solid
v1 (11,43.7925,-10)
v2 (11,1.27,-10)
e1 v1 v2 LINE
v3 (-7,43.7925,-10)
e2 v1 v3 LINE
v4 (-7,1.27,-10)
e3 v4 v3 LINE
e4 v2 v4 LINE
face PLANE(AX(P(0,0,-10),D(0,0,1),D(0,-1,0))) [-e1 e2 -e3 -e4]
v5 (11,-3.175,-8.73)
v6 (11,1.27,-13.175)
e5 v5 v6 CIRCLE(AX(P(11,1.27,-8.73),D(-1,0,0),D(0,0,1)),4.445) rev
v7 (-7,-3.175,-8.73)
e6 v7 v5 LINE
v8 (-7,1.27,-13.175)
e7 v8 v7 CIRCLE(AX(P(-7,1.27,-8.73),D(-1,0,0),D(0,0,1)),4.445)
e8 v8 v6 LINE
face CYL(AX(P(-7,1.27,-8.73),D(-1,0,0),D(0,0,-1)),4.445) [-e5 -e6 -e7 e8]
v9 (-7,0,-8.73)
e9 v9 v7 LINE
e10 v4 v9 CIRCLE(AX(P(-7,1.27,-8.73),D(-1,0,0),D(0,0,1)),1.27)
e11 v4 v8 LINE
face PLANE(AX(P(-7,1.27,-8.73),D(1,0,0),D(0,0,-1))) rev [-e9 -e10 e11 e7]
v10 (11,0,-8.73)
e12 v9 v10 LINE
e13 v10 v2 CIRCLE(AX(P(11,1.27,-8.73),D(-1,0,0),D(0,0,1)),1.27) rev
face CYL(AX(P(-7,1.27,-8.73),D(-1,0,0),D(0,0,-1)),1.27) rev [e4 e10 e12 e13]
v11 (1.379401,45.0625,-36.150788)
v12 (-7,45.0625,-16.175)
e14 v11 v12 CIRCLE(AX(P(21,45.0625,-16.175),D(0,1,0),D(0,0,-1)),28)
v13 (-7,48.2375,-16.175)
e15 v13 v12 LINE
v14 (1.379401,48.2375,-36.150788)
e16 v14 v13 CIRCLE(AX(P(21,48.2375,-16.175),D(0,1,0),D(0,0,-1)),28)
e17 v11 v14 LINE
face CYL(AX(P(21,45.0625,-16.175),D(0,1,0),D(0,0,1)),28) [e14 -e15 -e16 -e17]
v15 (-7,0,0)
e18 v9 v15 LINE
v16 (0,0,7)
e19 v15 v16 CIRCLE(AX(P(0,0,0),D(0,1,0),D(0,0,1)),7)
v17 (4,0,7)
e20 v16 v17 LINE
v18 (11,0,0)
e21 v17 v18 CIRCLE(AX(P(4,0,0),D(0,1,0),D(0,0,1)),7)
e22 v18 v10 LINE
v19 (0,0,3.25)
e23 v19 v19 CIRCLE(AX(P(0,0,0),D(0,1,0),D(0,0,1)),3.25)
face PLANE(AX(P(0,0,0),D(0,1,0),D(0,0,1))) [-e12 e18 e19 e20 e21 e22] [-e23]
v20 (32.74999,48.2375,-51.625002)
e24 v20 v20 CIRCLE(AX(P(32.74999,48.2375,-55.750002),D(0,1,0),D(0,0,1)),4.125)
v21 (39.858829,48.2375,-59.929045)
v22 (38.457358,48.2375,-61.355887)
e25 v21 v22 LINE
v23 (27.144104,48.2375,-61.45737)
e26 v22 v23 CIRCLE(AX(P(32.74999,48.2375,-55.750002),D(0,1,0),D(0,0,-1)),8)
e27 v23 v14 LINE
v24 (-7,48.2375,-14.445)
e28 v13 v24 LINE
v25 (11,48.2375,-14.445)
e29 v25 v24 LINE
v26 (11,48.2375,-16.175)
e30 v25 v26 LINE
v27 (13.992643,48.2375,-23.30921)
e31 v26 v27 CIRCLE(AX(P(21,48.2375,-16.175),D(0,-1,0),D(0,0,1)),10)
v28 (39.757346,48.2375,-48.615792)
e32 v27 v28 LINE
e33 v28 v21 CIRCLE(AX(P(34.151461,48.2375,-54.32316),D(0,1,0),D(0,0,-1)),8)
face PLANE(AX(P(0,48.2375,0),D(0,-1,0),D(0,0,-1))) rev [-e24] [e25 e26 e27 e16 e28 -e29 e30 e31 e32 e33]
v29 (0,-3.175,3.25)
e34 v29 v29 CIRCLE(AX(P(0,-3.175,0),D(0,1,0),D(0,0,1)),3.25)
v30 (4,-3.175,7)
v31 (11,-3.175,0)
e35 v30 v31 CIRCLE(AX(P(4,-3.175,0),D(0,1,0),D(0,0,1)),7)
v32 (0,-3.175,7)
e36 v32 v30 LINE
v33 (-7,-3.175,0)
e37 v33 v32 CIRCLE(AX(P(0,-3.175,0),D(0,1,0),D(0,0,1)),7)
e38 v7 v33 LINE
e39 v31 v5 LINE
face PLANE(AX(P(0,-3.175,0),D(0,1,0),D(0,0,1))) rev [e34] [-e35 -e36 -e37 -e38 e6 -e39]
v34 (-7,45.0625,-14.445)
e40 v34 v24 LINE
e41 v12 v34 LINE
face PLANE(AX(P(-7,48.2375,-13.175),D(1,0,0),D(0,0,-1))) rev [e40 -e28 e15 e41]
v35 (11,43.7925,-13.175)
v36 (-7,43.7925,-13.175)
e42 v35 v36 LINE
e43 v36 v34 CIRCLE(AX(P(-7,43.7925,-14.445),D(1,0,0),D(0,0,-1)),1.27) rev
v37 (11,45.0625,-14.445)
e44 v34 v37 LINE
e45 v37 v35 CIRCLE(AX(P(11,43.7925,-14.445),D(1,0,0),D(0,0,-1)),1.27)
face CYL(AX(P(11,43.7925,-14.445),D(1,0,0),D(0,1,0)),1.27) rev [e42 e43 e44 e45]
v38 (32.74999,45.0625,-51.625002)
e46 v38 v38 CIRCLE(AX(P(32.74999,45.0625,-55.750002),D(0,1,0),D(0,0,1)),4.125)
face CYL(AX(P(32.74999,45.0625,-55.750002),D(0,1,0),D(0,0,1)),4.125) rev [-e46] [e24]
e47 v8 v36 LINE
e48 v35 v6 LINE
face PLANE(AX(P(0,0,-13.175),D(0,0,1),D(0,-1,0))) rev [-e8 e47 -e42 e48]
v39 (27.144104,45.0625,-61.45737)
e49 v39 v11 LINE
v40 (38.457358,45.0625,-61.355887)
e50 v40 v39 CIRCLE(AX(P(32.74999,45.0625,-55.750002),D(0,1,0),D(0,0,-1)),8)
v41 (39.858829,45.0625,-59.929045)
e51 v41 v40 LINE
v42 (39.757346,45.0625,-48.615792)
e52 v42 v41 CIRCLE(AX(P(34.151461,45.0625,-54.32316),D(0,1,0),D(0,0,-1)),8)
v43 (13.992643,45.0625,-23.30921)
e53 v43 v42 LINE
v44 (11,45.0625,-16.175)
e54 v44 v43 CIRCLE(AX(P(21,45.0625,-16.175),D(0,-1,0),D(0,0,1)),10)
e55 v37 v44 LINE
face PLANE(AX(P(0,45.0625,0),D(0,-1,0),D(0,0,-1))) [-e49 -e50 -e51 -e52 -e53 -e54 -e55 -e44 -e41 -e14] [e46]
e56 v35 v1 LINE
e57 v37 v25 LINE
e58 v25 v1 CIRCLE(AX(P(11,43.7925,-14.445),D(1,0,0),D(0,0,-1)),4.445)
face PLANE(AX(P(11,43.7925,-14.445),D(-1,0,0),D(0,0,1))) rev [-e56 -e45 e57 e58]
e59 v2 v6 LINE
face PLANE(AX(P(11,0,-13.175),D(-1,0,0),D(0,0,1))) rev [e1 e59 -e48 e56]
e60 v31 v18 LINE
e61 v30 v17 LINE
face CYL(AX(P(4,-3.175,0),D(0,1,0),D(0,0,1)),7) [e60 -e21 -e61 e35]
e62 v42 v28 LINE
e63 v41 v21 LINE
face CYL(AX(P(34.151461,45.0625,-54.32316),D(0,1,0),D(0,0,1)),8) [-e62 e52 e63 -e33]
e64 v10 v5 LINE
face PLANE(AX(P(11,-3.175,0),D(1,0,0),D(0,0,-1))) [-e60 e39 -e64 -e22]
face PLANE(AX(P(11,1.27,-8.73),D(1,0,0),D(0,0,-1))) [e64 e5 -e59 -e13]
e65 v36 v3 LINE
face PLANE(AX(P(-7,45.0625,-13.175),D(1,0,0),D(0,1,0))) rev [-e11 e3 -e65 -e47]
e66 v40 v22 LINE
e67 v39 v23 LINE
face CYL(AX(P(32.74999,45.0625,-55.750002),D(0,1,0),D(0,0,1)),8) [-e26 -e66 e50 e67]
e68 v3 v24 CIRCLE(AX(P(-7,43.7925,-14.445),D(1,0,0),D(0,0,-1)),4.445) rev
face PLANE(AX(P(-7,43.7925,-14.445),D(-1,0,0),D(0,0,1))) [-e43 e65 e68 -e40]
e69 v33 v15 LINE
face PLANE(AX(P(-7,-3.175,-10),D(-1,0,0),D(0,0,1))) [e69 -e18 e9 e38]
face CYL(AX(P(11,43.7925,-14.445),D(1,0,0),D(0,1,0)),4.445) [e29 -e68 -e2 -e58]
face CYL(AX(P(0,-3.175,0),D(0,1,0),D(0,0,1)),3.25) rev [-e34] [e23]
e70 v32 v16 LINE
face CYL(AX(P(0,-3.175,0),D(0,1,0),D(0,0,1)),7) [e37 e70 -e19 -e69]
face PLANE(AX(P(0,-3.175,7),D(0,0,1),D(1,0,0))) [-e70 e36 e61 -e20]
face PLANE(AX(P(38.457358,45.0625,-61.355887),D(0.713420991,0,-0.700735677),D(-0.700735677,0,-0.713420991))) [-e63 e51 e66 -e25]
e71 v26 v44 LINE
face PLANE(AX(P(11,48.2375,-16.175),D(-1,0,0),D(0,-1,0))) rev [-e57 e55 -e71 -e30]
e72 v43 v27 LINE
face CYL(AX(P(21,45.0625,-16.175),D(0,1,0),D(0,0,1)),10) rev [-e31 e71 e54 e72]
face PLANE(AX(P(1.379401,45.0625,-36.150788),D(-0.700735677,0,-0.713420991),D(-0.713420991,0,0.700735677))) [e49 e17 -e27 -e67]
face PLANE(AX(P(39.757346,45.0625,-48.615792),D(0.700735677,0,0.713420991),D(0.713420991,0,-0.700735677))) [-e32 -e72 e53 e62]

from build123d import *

# Parameters (mm, degrees)
SKETCH1_R                    = 3.25
BASE_FLANGE1_DEPTH           = 3.175
EDGE_FLANGE1_STRIP_W         = 15.24
EDGE_FLANGE1_STRIP_H         = 3.175
EDGE_FLANGE1_STRIP_CUT_DEPTH = 18
EDGE_FLANGE1_DEPTH           = 18
EDGE_FLANGE2_STRIP_W         = 15.24
EDGE_FLANGE2_STRIP_H         = 3.175
EDGE_FLANGE2_STRIP_CUT_DEPTH = 18
EDGE_FLANGE2_DEPTH           = 18
SKETCH12_R                   = 4.125
BOSS_EXTRUDE1_DEPTH          = 3.175


# Sheet-metal steps are written as plain solids
with BuildPart() as part:
    # Sketch1 → Base-Flange1 (new body)
    with BuildSketch(Plane(origin=(0, 0, 0), x_dir=(1, 0, 0), z_dir=(0, 1, 0))):
        with BuildLine():
            Line((-7, 10), (-7, 0))
            ThreePointArc((-7, 0), (-4.949747468, -4.949747468), (0, -7))
            Line((0, -7), (4, -7))
            ThreePointArc((4, -7), (8.949747468, -4.949747468), (11, 0))
            Line((11, 0), (11, 10))
            Line((11, 10), (-7, 10))
        make_face()
        with Locations(Location((0, 0, 0), (0, 0, 270))):
            Circle(SKETCH1_R, mode=Mode.SUBTRACT)
    extrude(amount=-BASE_FLANGE1_DEPTH)

    # Edge-Flange1 strip (across the edge) → Edge-Flange1 strip cut (cut)
    with BuildSketch(Plane(origin=(11, 0, -10), x_dir=(0, 0, 1), z_dir=(-1, 0, 0))):
        with Locations((-6.35, -1.5875)):
            Rectangle(EDGE_FLANGE1_STRIP_W, EDGE_FLANGE1_STRIP_H)
    extrude(amount=EDGE_FLANGE1_STRIP_CUT_DEPTH, mode=Mode.SUBTRACT)

    # Edge-Flange1 section (across the edge) → Edge-Flange1 (add)
    with BuildSketch(Plane(origin=(11, 0, -10), x_dir=(0, 0, 1), z_dir=(-1, 0, 0))):
        with BuildLine():
            Line((-3.175, 1.27), (-3.175, 45.0625))
            Line((-3.175, 45.0625), (0, 45.0625))
            Line((0, 45.0625), (0, 1.27))
            ThreePointArc((0, 1.27), (0.371974388, 0.371974388), (1.27, 0))
            Line((1.27, 0), (1.27, -3.175))
            ThreePointArc((1.27, -3.175), (-1.873089642, -1.873089642), (-3.175, 1.27))
        make_face()
    extrude(amount=EDGE_FLANGE1_DEPTH)

    # Edge-Flange2 strip (across the edge) → Edge-Flange2 strip cut (cut)
    with BuildSketch(Plane(origin=(-7, 45.0625, -13.175), x_dir=(0, -1, 0), z_dir=(1, 0, 0))):
        with Locations((-6.35, -1.5875)):
            Rectangle(EDGE_FLANGE2_STRIP_W, EDGE_FLANGE2_STRIP_H)
    extrude(amount=EDGE_FLANGE2_STRIP_CUT_DEPTH, mode=Mode.SUBTRACT)

    # Edge-Flange2 section (across the edge) → Edge-Flange2 (add)
    with BuildSketch(Plane(origin=(-7, 45.0625, -13.175), x_dir=(0, -1, 0), z_dir=(1, 0, 0))):
        with BuildLine():
            Line((-3.175, 1.27), (-3.175, 3))
            Line((-3.175, 3), (0, 3))
            Line((0, 3), (0, 1.27))
            ThreePointArc((0, 1.27), (0.371974388, 0.371974388), (1.27, 0))
            Line((1.27, 0), (1.27, -3.175))
            ThreePointArc((1.27, -3.175), (-1.873089642, -1.873089642), (-3.175, 1.27))
        make_face()
    extrude(amount=EDGE_FLANGE2_DEPTH)

    # Sketch12 → Boss-Extrude1 (add)
    with BuildSketch(Plane(origin=(0, 48.2375, 0), x_dir=(1, 0, 0), z_dir=(0, 1, 0))):
        with BuildLine():
            Line((11, 16.175), (-7, 16.175))
            ThreePointArc((-7, 16.175), (-4.820309554, 27.006048634), (1.379401037, 36.150787753))
            Line((1.379401037, 36.150787753), (27.144104233, 61.457369654))
            ThreePointArc((27.144104233, 61.457369654), (32.821748623, 63.749679884), (38.457357581, 61.355887143))
            Line((38.457357581, 61.355887143), (39.858828935, 59.92904516))
            ThreePointArc((39.858828935, 59.92904516), (42.151139165, 54.251400771), (39.757346424, 48.615791813))
            Line((39.757346424, 48.615791813), (13.992643228, 23.309209912))
            ThreePointArc((13.992643228, 23.309209912), (11.778460873, 20.043231655), (11, 16.175))
        make_face()
        with Locations(Location((32.749989651, 55.750001725, 0), (0, 0, 270))):
            Circle(SKETCH12_R, mode=Mode.SUBTRACT)
    extrude(amount=-BOSS_EXTRUDE1_DEPTH)


solid = part.part
